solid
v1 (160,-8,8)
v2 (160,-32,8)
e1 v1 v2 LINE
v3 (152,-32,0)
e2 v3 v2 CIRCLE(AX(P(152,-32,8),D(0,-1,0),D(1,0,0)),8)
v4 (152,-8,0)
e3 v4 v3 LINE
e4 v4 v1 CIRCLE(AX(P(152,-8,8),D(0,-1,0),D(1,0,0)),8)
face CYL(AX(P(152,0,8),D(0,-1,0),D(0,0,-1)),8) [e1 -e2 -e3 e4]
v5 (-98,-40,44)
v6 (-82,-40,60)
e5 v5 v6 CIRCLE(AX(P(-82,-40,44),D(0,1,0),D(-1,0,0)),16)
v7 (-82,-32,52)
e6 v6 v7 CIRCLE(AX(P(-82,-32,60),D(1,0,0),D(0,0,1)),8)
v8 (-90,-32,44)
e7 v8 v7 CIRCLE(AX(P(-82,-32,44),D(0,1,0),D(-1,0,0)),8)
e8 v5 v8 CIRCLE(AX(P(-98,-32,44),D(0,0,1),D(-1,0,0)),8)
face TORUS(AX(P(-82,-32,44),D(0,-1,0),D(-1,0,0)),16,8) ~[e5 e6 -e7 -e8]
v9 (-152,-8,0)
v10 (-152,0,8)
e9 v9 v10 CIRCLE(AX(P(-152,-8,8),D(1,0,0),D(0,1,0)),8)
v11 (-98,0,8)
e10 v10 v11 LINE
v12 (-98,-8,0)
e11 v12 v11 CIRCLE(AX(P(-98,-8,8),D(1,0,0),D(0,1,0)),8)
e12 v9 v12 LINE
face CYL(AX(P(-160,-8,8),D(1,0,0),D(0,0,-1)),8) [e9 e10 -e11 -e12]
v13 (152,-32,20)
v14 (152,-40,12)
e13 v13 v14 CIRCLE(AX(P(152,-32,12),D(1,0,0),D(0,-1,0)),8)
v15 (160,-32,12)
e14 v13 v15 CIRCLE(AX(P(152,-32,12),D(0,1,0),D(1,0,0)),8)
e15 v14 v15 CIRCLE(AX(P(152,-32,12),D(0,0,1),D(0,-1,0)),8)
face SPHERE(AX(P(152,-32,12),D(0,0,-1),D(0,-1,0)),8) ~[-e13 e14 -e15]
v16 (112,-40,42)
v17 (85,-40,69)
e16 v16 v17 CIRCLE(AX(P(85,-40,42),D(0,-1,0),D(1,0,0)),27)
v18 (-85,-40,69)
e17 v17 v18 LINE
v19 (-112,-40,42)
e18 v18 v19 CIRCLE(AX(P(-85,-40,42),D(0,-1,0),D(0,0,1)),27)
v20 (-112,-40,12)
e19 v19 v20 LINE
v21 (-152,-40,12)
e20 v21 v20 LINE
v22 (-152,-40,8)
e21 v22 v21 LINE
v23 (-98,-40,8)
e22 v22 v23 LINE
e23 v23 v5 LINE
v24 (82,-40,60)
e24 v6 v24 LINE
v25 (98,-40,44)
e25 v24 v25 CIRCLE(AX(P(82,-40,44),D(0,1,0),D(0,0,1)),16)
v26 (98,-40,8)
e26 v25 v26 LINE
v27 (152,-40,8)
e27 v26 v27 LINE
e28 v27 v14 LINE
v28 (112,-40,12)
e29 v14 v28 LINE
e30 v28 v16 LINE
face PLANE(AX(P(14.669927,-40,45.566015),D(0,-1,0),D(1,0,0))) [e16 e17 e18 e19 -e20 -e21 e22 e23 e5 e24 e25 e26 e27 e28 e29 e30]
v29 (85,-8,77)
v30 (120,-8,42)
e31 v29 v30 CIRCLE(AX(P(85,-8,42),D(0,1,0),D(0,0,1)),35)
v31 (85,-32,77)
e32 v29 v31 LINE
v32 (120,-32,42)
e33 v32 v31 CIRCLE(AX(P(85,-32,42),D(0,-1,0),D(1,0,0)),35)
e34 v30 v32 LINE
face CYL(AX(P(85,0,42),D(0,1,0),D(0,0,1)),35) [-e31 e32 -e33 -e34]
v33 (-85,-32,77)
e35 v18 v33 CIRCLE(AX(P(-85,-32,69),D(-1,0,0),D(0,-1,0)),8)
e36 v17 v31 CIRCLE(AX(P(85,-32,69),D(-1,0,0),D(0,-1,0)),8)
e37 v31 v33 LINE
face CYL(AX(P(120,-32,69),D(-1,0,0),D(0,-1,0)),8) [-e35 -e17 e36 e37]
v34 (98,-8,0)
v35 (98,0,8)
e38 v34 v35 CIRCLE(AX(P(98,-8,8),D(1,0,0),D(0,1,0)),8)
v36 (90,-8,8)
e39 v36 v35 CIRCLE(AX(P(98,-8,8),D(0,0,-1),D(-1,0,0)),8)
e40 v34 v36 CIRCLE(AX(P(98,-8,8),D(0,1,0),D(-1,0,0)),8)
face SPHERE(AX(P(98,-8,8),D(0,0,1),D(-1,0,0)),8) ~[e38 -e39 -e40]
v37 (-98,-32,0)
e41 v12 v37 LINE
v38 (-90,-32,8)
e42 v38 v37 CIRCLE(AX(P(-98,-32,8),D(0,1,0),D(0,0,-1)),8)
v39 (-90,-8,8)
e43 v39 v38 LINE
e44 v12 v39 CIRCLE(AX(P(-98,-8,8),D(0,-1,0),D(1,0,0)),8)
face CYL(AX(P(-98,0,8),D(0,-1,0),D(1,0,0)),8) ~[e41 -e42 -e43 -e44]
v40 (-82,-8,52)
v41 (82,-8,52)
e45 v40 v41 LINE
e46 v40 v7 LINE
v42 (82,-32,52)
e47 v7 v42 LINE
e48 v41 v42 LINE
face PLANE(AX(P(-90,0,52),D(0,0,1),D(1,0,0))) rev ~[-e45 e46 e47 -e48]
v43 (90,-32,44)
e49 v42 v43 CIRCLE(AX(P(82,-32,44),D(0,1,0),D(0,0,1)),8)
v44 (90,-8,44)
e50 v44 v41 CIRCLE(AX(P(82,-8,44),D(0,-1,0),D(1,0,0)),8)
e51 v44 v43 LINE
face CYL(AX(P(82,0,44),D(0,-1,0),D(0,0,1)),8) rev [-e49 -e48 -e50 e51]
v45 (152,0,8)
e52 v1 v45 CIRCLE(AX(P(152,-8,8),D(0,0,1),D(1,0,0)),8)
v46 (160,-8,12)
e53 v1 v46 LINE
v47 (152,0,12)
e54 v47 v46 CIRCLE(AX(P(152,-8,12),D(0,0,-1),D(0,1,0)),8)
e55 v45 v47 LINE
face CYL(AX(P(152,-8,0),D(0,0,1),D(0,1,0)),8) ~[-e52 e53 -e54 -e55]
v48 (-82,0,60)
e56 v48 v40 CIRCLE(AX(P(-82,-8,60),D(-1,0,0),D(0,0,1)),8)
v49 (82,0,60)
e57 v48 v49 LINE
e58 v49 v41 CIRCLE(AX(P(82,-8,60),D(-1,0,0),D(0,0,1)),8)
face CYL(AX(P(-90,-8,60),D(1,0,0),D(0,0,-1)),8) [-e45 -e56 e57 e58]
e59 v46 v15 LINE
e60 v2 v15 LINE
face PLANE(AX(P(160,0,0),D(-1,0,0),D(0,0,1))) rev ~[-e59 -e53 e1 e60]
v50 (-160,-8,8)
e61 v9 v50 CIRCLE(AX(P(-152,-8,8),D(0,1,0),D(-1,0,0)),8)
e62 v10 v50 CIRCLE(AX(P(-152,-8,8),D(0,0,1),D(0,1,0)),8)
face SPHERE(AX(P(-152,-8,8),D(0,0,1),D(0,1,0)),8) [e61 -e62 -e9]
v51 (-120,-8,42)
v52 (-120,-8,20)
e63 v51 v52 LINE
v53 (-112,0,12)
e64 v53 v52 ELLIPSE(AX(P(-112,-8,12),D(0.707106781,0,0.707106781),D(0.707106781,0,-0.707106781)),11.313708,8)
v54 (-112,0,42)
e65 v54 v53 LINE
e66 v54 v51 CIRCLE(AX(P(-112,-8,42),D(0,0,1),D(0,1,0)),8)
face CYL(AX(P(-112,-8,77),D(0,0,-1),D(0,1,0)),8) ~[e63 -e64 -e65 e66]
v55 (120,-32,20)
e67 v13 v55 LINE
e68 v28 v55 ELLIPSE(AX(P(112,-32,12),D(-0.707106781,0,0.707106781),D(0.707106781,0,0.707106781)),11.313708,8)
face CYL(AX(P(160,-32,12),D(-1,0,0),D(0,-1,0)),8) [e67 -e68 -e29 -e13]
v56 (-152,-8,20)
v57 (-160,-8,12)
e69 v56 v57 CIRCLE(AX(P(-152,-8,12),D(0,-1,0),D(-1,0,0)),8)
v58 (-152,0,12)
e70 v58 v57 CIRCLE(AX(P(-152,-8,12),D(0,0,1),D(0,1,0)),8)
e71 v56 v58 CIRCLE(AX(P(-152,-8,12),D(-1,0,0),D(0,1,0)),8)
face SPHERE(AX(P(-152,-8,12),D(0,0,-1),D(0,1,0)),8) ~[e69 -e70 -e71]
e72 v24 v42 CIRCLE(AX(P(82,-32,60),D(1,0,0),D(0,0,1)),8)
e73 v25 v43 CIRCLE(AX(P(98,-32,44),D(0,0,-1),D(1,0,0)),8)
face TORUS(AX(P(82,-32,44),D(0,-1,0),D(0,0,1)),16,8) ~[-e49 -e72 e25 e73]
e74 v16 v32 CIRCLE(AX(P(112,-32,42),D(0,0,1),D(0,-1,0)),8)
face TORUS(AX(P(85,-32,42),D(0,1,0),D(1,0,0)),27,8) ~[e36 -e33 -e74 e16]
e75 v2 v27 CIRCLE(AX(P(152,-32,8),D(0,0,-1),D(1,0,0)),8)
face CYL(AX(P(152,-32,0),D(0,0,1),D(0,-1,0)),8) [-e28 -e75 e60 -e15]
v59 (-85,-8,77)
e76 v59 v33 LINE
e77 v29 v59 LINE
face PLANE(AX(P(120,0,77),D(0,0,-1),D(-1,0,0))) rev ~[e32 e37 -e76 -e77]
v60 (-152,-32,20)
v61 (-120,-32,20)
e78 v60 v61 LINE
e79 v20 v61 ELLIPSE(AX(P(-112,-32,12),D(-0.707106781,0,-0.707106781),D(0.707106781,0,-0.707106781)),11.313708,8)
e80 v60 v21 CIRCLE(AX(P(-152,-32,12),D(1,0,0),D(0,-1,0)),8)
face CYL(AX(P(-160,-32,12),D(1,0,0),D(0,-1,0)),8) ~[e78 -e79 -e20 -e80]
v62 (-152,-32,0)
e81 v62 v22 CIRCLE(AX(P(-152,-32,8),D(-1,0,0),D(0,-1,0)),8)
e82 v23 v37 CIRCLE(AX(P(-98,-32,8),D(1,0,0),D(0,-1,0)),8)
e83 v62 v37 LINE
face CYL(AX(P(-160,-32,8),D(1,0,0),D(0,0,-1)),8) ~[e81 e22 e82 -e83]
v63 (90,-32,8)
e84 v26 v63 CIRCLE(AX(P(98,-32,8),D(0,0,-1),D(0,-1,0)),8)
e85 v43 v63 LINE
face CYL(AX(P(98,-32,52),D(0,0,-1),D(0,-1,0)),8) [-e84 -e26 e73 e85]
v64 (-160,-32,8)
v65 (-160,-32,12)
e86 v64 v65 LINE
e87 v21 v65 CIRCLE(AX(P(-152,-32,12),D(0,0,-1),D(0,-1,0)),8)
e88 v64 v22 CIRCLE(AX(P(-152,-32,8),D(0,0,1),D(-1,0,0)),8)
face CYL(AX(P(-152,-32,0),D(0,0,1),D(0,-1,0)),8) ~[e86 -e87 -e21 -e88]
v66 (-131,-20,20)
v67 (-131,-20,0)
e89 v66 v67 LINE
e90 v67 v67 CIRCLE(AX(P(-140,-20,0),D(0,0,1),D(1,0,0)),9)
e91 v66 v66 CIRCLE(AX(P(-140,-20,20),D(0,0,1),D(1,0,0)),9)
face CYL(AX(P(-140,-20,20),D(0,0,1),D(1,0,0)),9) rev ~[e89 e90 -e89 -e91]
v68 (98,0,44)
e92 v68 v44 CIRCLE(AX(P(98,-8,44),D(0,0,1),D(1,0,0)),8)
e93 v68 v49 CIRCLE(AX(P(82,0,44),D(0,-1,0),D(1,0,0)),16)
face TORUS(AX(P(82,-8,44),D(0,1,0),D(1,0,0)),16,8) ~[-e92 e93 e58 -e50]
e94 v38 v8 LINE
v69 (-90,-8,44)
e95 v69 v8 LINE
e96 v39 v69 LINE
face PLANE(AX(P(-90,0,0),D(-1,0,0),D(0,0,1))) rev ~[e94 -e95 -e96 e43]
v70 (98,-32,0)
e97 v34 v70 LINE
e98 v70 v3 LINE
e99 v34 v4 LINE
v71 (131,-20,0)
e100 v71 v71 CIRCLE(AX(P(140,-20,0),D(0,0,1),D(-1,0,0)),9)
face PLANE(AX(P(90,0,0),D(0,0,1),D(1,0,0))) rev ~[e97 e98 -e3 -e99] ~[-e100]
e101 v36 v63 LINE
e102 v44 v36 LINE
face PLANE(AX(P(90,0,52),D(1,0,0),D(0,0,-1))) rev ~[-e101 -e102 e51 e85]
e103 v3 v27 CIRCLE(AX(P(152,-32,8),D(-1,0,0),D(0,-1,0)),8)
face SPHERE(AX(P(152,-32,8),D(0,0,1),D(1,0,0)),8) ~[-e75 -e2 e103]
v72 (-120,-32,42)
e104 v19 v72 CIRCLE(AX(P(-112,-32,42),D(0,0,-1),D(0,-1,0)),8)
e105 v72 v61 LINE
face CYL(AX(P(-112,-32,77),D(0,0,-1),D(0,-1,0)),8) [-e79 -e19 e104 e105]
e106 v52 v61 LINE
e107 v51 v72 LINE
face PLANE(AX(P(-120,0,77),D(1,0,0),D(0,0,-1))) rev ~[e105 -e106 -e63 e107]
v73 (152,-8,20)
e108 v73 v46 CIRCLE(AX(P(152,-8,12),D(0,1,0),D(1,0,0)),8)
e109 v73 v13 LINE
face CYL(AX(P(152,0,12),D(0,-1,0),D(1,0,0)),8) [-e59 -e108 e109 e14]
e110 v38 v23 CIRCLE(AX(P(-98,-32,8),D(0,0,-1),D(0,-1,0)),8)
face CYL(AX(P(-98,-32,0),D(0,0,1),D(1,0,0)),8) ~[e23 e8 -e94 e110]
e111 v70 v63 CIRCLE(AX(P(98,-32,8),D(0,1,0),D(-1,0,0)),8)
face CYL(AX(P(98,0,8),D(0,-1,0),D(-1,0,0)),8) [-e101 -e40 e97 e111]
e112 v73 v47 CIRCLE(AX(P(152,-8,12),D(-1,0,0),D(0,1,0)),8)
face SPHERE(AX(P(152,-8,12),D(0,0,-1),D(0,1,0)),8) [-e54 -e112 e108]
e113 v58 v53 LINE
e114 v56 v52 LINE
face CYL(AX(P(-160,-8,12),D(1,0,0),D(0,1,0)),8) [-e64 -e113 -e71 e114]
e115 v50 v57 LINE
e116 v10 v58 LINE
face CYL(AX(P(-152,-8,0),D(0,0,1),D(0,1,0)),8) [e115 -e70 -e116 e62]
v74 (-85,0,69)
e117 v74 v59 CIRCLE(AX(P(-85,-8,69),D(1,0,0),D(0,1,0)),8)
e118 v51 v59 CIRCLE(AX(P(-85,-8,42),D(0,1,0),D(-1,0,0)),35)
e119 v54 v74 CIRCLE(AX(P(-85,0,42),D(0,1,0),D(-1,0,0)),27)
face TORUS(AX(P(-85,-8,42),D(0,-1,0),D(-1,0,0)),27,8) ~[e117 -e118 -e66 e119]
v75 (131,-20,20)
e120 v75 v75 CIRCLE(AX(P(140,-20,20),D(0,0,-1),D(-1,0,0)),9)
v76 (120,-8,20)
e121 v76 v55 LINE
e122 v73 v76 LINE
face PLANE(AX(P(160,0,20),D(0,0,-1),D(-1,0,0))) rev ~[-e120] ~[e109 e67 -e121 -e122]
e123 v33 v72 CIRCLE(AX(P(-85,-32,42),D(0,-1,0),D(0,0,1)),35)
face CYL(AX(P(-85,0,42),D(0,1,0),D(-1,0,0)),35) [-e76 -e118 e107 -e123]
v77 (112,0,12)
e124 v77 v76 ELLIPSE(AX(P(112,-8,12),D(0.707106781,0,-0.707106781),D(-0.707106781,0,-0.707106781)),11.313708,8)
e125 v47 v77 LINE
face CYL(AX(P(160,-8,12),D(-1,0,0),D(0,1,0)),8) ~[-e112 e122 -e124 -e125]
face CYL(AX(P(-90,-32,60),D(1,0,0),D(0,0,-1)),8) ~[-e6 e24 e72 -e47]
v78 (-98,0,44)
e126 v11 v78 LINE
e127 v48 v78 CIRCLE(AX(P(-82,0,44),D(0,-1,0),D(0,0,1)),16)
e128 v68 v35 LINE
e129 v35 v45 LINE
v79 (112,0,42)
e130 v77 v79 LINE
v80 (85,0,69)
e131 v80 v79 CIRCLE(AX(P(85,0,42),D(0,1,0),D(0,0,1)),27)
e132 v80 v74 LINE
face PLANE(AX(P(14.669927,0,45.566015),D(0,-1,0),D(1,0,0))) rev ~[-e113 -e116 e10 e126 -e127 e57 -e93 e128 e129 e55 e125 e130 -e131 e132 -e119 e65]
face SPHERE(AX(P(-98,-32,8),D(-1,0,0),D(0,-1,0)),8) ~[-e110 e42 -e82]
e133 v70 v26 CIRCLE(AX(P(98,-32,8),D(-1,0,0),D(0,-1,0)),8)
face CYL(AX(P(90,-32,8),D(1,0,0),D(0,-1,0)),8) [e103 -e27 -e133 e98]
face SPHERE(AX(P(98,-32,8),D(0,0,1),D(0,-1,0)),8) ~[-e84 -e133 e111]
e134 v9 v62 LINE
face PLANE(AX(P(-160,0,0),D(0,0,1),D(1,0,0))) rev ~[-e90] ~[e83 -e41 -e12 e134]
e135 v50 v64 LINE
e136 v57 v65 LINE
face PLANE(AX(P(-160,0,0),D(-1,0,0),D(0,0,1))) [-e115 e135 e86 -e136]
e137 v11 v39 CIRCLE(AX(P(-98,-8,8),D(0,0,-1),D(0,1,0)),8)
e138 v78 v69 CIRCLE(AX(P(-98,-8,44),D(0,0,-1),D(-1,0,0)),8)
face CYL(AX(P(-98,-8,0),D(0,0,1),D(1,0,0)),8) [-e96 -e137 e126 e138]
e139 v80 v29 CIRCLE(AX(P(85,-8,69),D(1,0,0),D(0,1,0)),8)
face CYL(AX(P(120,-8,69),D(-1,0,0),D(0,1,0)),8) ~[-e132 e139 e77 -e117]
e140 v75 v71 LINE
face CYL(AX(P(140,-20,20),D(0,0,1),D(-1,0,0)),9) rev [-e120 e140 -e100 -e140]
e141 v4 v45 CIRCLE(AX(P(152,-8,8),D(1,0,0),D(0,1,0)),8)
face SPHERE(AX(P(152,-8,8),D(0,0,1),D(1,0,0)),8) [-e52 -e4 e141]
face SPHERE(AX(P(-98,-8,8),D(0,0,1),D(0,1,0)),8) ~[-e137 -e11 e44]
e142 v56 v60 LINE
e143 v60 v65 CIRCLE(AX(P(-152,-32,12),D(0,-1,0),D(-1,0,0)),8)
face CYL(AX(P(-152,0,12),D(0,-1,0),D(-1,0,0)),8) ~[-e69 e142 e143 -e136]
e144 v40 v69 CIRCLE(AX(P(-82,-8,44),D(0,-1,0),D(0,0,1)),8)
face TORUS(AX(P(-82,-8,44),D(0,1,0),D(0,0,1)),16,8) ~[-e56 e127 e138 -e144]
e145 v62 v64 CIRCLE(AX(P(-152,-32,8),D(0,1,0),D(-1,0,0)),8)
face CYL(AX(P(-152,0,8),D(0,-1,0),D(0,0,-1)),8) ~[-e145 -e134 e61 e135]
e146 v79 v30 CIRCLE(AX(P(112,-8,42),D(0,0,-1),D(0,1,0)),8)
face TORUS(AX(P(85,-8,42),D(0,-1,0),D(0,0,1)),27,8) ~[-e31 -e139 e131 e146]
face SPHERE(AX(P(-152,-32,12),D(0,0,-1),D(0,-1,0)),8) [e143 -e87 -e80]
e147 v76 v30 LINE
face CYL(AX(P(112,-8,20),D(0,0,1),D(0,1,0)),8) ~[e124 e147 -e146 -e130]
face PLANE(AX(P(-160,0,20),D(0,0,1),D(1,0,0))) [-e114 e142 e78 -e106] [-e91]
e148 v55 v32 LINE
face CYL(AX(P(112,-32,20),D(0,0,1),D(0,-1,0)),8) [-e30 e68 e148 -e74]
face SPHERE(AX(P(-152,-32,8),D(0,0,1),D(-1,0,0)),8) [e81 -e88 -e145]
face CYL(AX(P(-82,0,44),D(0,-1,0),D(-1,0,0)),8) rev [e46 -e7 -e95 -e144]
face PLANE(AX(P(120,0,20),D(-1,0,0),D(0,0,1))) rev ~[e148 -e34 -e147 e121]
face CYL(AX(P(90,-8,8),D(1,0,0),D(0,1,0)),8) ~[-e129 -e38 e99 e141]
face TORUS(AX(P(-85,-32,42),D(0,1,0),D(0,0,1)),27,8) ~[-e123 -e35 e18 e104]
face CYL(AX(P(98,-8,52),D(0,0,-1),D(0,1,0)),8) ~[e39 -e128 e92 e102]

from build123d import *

# Parameters (mm, degrees)
F0_W         = 40
F0_H         = 20
F1_DEPTH     = 40
F2_R         = 9
F3_DEPTH     = 74.7
F4_R         = 8
F5_T1_DEPTH  = 40
F5_T4_ANGLE  = 90
F5_T6_ANGLE  = 90
F5_T8_ANGLE  = 90
F5_T10_ANGLE = 90


# Not quite as in the source:
# - a fillet or chamfer that OpenCascade refuses, or shapes differently, is made with other operations: its cross-section is extruded or revolved along the edge and cut away or added
# - a pattern or mirror of a feature is missing from the dataset's text; its kind, count and spacing are read off the source's solid


with BuildPart() as f1:
    # F0 (on Front) → F1 (new body)
    with BuildSketch(Plane.XZ):
        Polygon((-120, 20), (-120, 0), (-90, 0), (-90, 52), (0, 52), (90, 52), (90, 0), (120, 0), (160, 0), (160, 20), (120, 20), (120, 52), (120, 77), (0, 77), (-120, 77), (-120, 52), align=None)
        with Locations((-140, 10)):
            Rectangle(F0_W, F0_H)
    extrude(amount=F1_DEPTH)

    # F2 (on face) → F3 (cut)
    with BuildSketch(Plane.XY.offset(20)):
        with Locations((-140, -20)):
            Circle(F2_R)
    f3 = extrude(amount=-F3_DEPTH, mode=Mode.SUBTRACT)

    # F3_copies: F3 across plane
    add(f3.mirror(Plane(origin=(0, 0, 0), x_dir=(0, 0, 1), z_dir=(1, 0, 0))), mode=Mode.SUBTRACT)

    # F4
    f4_edges = [f1.edges().sort_by_distance(p)[0] for p in [
        (-160, -40, 10),
        (-160, 0, 10),
        (160, 0, 10),
        (160, -40, 10),
        (140, 0, 20),
        (120, 0, 48.5),
        (0, 0, 77),
        (-120, 0, 48.5),
        (-140, 0, 20),
        (-140, -40, 20),
        (-120, -40, 48.5),
        (0, -40, 77),
        (120, -40, 48.5),
        (140, -40, 20),
        (160, -20, 20),
        (160, -20, 0),
        (90, 0, 26),
        (0, 0, 52),
        (-90, 0, 26),
        (-125, 0, 0),
        (-160, -20, 0),
        (-125, -40, 0),
        (-90, -40, 26),
        (0, -40, 52),
        (90, -40, 26),
        (125, -40, 0),
        (90, -20, 0),
        (90, -20, 52),
        (-90, -20, 52),
        (-160, -20, 20),
        (125, 0, 0),
        (-90, -20, 0),
    ]]
    fillet(f4_edges, radius=F4_R)

    # F5: fillet of radius 35 on 2 edges, made by hand

    # F5_s2 → F5_t1 (cut)
    with BuildSketch(Plane.XZ):
        with BuildLine():
            ThreePointArc((-120, 42), (-109.7487373415, 66.7487373415), (-85, 77))
            Line((-85, 77), (-120, 77))
            Line((-120, 77), (-120, 42))
        make_face()
        with BuildLine():
            ThreePointArc((85, 77), (109.7487373415, 66.7487373415), (120, 42))
            Line((120, 42), (120, 77))
            Line((120, 77), (85, 77))
        make_face()
    extrude(amount=F5_T1_DEPTH, mode=Mode.SUBTRACT)

    # F5_s3 → F5_t4 (revolve, cut)
    with BuildSketch(Plane.YZ.offset(85)):
        with BuildLine():
            ThreePointArc((0, 69), (-2.3431457505, 74.6568542495), (-8, 77))
            Line((-8, 77), (0, 77))
            Line((0, 77), (0, 69))
        make_face()
    revolve(axis=Axis((85, 0, 42), (0, 1, 0)), revolution_arc=F5_T4_ANGLE, mode=Mode.SUBTRACT)

    # F5_s5 → F5_t6 (revolve, cut)
    with BuildSketch(Plane.XY.offset(42)):
        with BuildLine():
            ThreePointArc((112, -40), (117.6568542495, -37.6568542495), (120, -32))
            Line((120, -32), (120, -40))
            Line((120, -40), (112, -40))
        make_face()
    revolve(axis=Axis((85, -40, 42), (0, -1, 0)), revolution_arc=F5_T6_ANGLE, mode=Mode.SUBTRACT)

    # F5_s7 → F5_t8 (revolve, cut)
    with BuildSketch(Plane.XY.offset(42)):
        with BuildLine():
            ThreePointArc((-112, 0), (-117.6568542495, -2.3431457505), (-120, -8))
            Line((-120, -8), (-120, 0))
            Line((-120, 0), (-112, 0))
        make_face()
    revolve(axis=Axis((-85, 0, 42), (0, 1, 0)), revolution_arc=F5_T8_ANGLE, mode=Mode.SUBTRACT)

    # F5_s9 → F5_t10 (revolve, cut)
    with BuildSketch(Plane.YZ.offset(-85)):
        with BuildLine():
            ThreePointArc((-40, 69), (-37.6568542495, 74.6568542495), (-32, 77))
            Line((-32, 77), (-40, 77))
            Line((-40, 77), (-40, 69))
        make_face()
    revolve(axis=Axis((-85, -40, 42), (0, -1, 0)), revolution_arc=F5_T10_ANGLE, mode=Mode.SUBTRACT)


solid = f1.part
